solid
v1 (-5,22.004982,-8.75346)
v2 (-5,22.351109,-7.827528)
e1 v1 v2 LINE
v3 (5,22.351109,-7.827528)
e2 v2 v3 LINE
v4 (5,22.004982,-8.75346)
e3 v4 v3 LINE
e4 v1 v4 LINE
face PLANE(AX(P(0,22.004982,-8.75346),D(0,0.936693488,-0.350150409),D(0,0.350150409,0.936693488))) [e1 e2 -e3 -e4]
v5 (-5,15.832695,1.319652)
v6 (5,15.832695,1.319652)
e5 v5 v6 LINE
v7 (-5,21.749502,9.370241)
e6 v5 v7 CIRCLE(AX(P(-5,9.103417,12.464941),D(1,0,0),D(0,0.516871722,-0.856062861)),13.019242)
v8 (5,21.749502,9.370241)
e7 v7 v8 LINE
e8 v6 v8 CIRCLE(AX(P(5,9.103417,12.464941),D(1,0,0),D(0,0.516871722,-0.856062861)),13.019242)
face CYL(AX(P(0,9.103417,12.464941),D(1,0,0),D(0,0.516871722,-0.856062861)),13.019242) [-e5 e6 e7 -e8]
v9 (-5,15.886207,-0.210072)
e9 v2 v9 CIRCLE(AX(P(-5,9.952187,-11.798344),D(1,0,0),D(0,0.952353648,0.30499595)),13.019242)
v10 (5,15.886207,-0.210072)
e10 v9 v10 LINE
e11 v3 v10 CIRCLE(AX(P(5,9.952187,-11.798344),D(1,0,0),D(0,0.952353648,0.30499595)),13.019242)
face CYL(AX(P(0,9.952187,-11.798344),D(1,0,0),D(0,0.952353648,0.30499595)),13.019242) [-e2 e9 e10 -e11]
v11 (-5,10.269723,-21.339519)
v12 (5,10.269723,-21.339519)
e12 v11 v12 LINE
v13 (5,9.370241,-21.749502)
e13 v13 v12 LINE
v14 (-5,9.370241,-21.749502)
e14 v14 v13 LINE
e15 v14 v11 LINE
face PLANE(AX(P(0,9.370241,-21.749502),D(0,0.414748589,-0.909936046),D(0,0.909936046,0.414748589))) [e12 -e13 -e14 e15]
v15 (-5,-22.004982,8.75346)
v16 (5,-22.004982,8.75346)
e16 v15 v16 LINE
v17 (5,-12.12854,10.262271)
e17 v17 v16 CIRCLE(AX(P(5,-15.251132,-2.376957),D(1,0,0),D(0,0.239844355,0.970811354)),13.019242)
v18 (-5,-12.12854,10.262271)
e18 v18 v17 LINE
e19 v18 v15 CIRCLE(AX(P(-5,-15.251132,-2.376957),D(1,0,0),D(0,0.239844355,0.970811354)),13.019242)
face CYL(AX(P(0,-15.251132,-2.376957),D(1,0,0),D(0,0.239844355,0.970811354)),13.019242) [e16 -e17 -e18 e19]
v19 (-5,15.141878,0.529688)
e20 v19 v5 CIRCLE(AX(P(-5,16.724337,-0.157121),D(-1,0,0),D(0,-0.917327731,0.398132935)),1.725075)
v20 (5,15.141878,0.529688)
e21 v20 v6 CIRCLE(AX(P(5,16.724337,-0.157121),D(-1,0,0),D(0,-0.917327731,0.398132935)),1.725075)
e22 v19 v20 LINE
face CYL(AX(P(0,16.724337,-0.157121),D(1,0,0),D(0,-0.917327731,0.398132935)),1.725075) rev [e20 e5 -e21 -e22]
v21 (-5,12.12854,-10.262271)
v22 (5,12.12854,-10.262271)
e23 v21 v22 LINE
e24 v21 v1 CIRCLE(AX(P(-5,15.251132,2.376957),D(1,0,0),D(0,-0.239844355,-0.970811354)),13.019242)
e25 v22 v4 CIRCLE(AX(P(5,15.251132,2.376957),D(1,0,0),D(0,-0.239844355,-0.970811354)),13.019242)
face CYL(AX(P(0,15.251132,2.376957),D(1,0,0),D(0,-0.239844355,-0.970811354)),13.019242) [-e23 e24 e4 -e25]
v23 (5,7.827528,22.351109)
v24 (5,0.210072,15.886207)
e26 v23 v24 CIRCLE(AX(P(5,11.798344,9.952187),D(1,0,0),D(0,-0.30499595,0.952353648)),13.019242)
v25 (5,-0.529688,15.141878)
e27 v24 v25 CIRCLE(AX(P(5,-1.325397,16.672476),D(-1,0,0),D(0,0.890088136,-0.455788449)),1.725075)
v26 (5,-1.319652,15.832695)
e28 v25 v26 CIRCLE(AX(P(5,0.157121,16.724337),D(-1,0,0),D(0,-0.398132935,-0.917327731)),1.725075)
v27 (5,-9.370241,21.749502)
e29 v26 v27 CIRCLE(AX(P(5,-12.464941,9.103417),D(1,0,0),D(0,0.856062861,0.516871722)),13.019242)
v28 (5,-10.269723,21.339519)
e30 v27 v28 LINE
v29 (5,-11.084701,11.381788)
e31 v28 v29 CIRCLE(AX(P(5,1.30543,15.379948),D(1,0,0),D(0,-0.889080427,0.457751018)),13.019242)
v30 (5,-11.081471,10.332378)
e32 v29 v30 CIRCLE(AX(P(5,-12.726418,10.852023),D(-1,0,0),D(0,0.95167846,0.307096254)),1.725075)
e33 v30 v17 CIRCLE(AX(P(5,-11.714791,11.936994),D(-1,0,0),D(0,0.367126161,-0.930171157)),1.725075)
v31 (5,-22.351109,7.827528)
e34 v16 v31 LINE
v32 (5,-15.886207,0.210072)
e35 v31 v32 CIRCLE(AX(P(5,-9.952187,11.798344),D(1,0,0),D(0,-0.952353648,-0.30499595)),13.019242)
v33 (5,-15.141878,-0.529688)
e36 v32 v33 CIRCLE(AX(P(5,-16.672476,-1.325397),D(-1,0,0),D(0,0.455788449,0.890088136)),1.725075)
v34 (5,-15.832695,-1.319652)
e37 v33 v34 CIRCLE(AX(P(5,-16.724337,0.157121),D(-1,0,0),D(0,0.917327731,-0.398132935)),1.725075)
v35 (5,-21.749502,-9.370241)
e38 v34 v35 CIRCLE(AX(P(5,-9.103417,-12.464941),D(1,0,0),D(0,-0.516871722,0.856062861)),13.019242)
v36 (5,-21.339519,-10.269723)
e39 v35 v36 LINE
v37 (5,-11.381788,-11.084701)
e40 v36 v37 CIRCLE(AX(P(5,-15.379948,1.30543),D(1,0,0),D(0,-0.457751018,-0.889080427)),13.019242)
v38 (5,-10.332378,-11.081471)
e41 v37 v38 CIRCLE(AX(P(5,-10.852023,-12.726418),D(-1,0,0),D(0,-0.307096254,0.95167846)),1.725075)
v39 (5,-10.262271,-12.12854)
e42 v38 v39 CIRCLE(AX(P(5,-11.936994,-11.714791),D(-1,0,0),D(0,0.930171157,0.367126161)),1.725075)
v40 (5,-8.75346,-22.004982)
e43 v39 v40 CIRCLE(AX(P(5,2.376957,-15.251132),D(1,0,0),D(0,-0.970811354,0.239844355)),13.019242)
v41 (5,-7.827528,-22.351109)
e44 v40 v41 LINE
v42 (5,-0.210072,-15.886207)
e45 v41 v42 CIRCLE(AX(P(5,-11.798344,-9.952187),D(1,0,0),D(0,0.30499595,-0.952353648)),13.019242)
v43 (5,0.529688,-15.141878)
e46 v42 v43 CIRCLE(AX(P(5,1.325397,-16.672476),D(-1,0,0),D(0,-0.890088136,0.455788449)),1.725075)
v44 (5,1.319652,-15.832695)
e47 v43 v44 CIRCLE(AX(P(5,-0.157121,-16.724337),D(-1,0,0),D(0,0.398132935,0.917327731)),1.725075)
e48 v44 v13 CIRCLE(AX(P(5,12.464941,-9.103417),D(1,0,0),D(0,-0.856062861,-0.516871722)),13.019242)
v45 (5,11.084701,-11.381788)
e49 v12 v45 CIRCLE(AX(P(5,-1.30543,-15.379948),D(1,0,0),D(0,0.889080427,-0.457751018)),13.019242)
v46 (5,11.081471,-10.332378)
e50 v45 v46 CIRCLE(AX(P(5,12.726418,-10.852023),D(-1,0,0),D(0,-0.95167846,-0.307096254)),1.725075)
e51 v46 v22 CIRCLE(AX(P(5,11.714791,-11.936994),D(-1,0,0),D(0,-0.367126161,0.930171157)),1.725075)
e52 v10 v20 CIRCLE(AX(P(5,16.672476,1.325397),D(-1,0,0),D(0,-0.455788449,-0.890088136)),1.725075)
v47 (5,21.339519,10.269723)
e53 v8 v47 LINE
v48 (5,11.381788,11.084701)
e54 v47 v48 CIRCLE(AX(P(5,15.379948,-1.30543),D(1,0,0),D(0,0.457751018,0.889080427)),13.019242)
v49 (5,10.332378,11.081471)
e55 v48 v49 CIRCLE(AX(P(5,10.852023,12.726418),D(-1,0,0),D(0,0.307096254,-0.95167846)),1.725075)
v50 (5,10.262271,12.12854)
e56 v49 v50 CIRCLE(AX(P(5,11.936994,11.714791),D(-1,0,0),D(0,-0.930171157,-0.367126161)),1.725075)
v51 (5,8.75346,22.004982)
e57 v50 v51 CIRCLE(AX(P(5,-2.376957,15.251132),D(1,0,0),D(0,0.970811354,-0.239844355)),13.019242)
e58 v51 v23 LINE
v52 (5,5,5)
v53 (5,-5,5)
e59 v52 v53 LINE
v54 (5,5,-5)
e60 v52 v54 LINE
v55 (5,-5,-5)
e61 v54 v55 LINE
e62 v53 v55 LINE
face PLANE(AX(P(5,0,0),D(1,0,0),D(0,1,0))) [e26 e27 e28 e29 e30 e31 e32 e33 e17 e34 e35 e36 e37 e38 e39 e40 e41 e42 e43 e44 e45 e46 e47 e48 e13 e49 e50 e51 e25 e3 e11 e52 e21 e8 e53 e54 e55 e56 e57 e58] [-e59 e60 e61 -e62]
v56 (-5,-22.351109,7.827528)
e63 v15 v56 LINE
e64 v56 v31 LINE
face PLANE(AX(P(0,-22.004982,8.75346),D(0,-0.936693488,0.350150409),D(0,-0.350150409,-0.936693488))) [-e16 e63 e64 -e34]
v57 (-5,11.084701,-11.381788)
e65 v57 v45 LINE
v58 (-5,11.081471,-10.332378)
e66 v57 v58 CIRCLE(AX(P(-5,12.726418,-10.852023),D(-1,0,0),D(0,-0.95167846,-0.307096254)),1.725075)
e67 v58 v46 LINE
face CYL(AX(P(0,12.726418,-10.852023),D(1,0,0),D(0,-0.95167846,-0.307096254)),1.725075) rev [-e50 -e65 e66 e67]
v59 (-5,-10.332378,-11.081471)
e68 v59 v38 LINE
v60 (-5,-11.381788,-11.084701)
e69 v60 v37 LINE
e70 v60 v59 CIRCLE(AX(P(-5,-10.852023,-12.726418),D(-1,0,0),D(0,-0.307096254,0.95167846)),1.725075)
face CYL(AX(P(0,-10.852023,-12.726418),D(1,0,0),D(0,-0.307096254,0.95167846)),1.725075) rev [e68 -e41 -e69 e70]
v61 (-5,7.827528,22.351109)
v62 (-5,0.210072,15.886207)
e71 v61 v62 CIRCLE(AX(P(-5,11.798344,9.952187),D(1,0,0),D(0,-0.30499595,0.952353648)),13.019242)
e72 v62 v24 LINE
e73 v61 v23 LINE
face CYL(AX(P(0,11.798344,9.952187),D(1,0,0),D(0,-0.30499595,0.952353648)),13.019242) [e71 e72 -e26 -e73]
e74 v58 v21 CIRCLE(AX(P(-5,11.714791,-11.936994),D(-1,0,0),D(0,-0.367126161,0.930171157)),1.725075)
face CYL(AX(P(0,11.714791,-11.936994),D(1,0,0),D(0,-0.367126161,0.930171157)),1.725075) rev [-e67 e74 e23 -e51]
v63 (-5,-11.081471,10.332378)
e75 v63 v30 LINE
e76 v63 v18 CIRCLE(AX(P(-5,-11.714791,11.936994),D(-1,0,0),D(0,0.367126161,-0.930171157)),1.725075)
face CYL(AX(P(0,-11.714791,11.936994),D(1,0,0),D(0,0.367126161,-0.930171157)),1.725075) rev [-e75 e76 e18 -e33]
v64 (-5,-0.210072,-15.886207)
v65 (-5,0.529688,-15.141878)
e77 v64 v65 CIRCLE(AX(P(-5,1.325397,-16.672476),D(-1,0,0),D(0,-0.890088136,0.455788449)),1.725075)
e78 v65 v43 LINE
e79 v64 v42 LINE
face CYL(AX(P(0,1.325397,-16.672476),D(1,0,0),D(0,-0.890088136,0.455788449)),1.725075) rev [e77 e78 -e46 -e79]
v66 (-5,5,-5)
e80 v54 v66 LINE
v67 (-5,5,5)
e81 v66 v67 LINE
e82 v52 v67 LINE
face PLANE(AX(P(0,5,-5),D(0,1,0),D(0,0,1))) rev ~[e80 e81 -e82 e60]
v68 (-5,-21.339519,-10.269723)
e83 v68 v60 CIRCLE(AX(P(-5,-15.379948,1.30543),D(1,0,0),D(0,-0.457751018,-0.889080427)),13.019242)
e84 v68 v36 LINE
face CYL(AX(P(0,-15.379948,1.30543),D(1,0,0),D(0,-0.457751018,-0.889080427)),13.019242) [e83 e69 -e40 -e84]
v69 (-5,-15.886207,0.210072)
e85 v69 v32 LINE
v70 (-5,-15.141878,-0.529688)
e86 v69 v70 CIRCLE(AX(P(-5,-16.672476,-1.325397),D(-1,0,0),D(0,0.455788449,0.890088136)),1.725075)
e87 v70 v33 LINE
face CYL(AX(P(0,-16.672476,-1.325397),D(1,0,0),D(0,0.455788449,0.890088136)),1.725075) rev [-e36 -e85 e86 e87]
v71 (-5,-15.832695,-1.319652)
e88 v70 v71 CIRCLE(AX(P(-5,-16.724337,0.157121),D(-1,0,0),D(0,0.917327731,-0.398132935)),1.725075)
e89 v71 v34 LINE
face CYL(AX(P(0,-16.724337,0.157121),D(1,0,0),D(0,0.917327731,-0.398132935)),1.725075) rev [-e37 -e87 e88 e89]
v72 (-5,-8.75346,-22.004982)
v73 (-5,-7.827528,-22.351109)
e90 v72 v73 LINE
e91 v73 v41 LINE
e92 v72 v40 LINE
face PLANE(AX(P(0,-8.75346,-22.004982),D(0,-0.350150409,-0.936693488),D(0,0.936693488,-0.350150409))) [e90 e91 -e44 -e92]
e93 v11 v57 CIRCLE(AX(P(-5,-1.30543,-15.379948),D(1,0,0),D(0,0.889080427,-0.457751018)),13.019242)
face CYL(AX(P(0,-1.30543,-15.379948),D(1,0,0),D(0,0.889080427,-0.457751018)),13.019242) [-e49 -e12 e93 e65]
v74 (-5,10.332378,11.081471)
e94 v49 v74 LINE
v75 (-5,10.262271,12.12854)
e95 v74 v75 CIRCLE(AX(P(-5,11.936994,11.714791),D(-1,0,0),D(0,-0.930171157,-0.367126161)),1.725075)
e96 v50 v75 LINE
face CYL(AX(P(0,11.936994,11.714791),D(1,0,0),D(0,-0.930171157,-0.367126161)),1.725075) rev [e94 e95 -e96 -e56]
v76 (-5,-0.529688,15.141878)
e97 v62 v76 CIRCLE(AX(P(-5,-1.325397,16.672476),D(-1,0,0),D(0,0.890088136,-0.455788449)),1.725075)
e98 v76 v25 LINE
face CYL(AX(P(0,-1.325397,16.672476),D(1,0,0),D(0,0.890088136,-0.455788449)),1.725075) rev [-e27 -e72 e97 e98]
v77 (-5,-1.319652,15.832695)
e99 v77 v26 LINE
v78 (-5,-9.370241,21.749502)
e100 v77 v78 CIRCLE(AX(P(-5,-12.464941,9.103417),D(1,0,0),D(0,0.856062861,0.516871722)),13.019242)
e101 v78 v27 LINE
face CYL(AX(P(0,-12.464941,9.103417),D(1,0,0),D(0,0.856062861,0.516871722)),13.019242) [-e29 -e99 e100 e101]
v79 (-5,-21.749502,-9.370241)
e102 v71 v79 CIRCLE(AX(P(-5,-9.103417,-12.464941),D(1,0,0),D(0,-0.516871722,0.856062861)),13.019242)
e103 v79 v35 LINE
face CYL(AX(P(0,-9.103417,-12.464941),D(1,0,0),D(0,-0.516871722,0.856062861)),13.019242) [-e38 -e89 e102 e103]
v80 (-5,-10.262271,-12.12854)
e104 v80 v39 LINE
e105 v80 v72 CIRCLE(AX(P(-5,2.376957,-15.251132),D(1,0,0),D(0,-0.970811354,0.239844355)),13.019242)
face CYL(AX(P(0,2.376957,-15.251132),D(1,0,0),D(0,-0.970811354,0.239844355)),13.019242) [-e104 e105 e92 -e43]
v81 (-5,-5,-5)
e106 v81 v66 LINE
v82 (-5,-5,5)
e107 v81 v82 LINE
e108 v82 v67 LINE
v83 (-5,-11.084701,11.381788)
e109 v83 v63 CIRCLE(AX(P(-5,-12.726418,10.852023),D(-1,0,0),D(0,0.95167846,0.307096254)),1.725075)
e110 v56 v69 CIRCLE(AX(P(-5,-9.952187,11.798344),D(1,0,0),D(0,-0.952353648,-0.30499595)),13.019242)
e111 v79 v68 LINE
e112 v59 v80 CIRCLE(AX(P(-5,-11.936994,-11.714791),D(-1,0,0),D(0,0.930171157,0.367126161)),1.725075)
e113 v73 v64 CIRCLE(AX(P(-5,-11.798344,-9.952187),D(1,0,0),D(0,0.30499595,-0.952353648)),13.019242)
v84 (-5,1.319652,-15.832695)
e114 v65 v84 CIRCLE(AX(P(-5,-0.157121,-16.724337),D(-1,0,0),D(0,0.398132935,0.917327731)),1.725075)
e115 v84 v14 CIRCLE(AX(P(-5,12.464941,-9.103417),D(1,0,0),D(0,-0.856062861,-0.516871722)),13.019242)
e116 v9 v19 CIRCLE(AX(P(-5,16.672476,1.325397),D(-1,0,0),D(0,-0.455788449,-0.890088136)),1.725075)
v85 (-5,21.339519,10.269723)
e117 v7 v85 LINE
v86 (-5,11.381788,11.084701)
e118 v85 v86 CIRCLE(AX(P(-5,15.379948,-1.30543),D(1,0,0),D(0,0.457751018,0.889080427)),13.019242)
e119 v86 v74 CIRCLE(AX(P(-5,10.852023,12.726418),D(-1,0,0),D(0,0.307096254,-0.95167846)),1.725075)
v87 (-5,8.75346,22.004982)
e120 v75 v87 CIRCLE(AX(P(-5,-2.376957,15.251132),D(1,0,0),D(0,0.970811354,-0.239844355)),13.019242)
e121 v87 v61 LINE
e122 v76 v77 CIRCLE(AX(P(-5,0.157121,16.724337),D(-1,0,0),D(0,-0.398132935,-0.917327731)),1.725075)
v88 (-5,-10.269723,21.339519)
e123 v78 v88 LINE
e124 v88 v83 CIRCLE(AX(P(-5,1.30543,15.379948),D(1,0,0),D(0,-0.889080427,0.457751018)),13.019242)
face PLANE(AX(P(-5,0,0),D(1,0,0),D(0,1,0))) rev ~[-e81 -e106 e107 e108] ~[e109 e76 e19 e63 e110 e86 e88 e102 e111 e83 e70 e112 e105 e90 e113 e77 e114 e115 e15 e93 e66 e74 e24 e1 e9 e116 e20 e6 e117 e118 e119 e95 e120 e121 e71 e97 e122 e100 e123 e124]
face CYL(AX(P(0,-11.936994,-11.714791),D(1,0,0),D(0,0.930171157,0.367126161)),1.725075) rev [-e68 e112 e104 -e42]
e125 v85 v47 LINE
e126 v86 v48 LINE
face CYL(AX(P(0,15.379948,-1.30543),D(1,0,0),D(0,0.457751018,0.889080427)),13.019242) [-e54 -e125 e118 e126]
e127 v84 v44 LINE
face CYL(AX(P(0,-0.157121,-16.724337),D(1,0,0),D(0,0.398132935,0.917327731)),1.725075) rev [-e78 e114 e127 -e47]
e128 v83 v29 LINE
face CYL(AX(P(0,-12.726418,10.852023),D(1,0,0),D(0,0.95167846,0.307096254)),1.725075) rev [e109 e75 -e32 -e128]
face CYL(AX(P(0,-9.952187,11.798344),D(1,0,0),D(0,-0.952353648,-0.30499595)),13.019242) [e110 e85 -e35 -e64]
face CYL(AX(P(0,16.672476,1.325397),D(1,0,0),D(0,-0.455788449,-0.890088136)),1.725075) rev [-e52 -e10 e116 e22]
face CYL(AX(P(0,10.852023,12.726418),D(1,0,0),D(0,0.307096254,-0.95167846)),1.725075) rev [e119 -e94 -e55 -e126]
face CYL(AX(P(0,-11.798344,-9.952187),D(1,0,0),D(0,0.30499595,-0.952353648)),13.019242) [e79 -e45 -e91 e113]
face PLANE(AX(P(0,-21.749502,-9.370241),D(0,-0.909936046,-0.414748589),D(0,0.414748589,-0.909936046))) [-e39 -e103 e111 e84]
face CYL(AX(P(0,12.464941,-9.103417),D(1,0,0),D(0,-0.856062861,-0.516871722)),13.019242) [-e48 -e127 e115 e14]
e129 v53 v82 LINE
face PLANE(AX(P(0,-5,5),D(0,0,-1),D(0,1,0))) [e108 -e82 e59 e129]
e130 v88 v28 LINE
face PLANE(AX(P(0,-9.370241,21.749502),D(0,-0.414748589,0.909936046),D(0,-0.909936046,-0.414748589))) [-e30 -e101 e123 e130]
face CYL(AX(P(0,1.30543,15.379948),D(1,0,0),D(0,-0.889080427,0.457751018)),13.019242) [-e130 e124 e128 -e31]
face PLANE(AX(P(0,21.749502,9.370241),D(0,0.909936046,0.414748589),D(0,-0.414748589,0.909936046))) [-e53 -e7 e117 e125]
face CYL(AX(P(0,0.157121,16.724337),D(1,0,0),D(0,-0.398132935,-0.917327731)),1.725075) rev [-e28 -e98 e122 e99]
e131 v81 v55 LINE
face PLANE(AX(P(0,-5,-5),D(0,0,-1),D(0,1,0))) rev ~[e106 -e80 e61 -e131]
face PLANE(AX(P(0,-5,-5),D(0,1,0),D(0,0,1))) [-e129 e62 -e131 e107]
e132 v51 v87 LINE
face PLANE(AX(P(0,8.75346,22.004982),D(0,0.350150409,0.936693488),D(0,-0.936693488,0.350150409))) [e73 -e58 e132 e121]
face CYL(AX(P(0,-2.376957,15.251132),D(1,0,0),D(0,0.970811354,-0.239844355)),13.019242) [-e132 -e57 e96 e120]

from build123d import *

# Parameters (mm, degrees)
F1_DEPTH      = 5
F2_W          = 10
F2_H          = 10
F3_DEPTH      = 5.001
F3_DEPTH_BACK = 5.001


with BuildPart() as f1:
    # F0 (on Right) → F1 (new body, symmetric)
    with BuildSketch(Plane.YZ):
        with BuildLine():
            Line((8.7534596749, 22.0049817023), (7.8275281652, 22.3511091184))
            ThreePointArc((7.8275281652, 22.3511091184), (3.3739717902, 19.8784451352), (0.2100715875, 15.8862067822))
            ThreePointArc((0.2100715875, 15.8862067822), (-0.1018352129, 15.4564251276), (-0.5296881322, 15.1418778303))
            ThreePointArc((-0.5296881322, 15.1418778303), (-0.9784750701, 15.4257588038), (-1.3196516389, 15.8326945133))
            ThreePointArc((-1.3196516389, 15.8326945133), (-4.754786797, 19.5940876069), (-9.3702410866, 21.7495024766))
            Line((-9.3702410866, 21.7495024766), (-10.2697225791, 21.3395190702))
            ThreePointArc((-10.2697225791, 21.3395190702), (-11.6704250222, 16.4419416869), (-11.084701499, 11.3817875871))
            ThreePointArc((-11.084701499, 11.3817875871), (-11.0013513902, 10.857334651), (-11.0814705639, 10.3323784235))
            ThreePointArc((-11.0814705639, 10.3323784235), (-11.5995450124, 10.2157722978), (-12.1285402775, 10.2622710322))
            ThreePointArc((-12.1285402775, 10.2622710322), (-17.2172542053, 10.4929702308), (-22.0049817023, 8.7534596749))
            Line((-22.0049817023, 8.7534596749), (-22.3511091184, 7.8275281652))
            ThreePointArc((-22.3511091184, 7.8275281652), (-19.8784451352, 3.3739717902), (-15.8862067822, 0.2100715875))
            ThreePointArc((-15.8862067822, 0.2100715875), (-15.4564251276, -0.1018352129), (-15.1418778303, -0.5296881322))
            ThreePointArc((-15.1418778303, -0.5296881322), (-15.4257588038, -0.9784750701), (-15.8326945133, -1.3196516389))
            ThreePointArc((-15.8326945133, -1.3196516389), (-19.5940876069, -4.754786797), (-21.7495024766, -9.3702410866))
            Line((-21.7495024766, -9.3702410866), (-21.3395190702, -10.2697225791))
            ThreePointArc((-21.3395190702, -10.2697225791), (-16.4419416869, -11.6704250222), (-11.3817875871, -11.084701499))
            ThreePointArc((-11.3817875871, -11.084701499), (-10.857334651, -11.0013513902), (-10.3323784235, -11.0814705639))
            ThreePointArc((-10.3323784235, -11.0814705639), (-10.2157722978, -11.5995450124), (-10.2622710322, -12.1285402775))
            ThreePointArc((-10.2622710322, -12.1285402775), (-10.4929702308, -17.2172542053), (-8.7534596749, -22.0049817023))
            Line((-8.7534596749, -22.0049817023), (-7.8275281652, -22.3511091184))
            ThreePointArc((-7.8275281652, -22.3511091184), (-3.3739717902, -19.8784451352), (-0.2100715875, -15.8862067822))
            ThreePointArc((-0.2100715875, -15.8862067822), (0.1018352129, -15.4564251276), (0.5296881322, -15.1418778303))
            ThreePointArc((0.5296881322, -15.1418778303), (0.9784750701, -15.4257588038), (1.3196516389, -15.8326945133))
            ThreePointArc((1.3196516389, -15.8326945133), (4.754786797, -19.5940876069), (9.3702410866, -21.7495024766))
            Line((9.3702410866, -21.7495024766), (10.2697225791, -21.3395190702))
            ThreePointArc((10.2697225791, -21.3395190702), (11.6704250222, -16.4419416869), (11.084701499, -11.3817875871))
            ThreePointArc((11.084701499, -11.3817875871), (11.0013513902, -10.857334651), (11.0814705639, -10.3323784235))
            ThreePointArc((11.0814705639, -10.3323784235), (11.5995450124, -10.2157722978), (12.1285402775, -10.2622710322))
            ThreePointArc((12.1285402775, -10.2622710322), (17.2172542053, -10.4929702308), (22.0049817023, -8.7534596749))
            Line((22.0049817023, -8.7534596749), (22.3511091184, -7.8275281652))
            ThreePointArc((22.3511091184, -7.8275281652), (19.8784451352, -3.3739717902), (15.8862067822, -0.2100715875))
            ThreePointArc((15.8862067822, -0.2100715875), (15.4564251276, 0.1018352129), (15.1418778303, 0.5296881322))
            ThreePointArc((15.1418778303, 0.5296881322), (15.4257588038, 0.9784750701), (15.8326945133, 1.3196516389))
            ThreePointArc((15.8326945133, 1.3196516389), (19.5940876069, 4.754786797), (21.7495024766, 9.3702410866))
            Line((21.7495024766, 9.3702410866), (21.3395190702, 10.2697225791))
            ThreePointArc((21.3395190702, 10.2697225791), (16.4419416869, 11.6704250222), (11.3817875871, 11.084701499))
            ThreePointArc((11.3817875871, 11.084701499), (10.857334651, 11.0013513902), (10.3323784235, 11.0814705639))
            ThreePointArc((10.3323784235, 11.0814705639), (10.2157722978, 11.5995450124), (10.2622710322, 12.1285402775))
            ThreePointArc((10.2622710322, 12.1285402775), (10.4929702308, 17.2172542053), (8.7534596749, 22.0049817023))
        make_face()
    extrude(amount=F1_DEPTH, both=True)

    # F2 (on Right) → F3 (cut, two sides)
    with BuildSketch(Plane.YZ) as f3_sk:
        Rectangle(F2_W, F2_H)
    extrude(amount=-F3_DEPTH, mode=Mode.SUBTRACT)
    extrude(f3_sk.sketch, amount=F3_DEPTH_BACK, mode=Mode.SUBTRACT)


solid = f1.part
